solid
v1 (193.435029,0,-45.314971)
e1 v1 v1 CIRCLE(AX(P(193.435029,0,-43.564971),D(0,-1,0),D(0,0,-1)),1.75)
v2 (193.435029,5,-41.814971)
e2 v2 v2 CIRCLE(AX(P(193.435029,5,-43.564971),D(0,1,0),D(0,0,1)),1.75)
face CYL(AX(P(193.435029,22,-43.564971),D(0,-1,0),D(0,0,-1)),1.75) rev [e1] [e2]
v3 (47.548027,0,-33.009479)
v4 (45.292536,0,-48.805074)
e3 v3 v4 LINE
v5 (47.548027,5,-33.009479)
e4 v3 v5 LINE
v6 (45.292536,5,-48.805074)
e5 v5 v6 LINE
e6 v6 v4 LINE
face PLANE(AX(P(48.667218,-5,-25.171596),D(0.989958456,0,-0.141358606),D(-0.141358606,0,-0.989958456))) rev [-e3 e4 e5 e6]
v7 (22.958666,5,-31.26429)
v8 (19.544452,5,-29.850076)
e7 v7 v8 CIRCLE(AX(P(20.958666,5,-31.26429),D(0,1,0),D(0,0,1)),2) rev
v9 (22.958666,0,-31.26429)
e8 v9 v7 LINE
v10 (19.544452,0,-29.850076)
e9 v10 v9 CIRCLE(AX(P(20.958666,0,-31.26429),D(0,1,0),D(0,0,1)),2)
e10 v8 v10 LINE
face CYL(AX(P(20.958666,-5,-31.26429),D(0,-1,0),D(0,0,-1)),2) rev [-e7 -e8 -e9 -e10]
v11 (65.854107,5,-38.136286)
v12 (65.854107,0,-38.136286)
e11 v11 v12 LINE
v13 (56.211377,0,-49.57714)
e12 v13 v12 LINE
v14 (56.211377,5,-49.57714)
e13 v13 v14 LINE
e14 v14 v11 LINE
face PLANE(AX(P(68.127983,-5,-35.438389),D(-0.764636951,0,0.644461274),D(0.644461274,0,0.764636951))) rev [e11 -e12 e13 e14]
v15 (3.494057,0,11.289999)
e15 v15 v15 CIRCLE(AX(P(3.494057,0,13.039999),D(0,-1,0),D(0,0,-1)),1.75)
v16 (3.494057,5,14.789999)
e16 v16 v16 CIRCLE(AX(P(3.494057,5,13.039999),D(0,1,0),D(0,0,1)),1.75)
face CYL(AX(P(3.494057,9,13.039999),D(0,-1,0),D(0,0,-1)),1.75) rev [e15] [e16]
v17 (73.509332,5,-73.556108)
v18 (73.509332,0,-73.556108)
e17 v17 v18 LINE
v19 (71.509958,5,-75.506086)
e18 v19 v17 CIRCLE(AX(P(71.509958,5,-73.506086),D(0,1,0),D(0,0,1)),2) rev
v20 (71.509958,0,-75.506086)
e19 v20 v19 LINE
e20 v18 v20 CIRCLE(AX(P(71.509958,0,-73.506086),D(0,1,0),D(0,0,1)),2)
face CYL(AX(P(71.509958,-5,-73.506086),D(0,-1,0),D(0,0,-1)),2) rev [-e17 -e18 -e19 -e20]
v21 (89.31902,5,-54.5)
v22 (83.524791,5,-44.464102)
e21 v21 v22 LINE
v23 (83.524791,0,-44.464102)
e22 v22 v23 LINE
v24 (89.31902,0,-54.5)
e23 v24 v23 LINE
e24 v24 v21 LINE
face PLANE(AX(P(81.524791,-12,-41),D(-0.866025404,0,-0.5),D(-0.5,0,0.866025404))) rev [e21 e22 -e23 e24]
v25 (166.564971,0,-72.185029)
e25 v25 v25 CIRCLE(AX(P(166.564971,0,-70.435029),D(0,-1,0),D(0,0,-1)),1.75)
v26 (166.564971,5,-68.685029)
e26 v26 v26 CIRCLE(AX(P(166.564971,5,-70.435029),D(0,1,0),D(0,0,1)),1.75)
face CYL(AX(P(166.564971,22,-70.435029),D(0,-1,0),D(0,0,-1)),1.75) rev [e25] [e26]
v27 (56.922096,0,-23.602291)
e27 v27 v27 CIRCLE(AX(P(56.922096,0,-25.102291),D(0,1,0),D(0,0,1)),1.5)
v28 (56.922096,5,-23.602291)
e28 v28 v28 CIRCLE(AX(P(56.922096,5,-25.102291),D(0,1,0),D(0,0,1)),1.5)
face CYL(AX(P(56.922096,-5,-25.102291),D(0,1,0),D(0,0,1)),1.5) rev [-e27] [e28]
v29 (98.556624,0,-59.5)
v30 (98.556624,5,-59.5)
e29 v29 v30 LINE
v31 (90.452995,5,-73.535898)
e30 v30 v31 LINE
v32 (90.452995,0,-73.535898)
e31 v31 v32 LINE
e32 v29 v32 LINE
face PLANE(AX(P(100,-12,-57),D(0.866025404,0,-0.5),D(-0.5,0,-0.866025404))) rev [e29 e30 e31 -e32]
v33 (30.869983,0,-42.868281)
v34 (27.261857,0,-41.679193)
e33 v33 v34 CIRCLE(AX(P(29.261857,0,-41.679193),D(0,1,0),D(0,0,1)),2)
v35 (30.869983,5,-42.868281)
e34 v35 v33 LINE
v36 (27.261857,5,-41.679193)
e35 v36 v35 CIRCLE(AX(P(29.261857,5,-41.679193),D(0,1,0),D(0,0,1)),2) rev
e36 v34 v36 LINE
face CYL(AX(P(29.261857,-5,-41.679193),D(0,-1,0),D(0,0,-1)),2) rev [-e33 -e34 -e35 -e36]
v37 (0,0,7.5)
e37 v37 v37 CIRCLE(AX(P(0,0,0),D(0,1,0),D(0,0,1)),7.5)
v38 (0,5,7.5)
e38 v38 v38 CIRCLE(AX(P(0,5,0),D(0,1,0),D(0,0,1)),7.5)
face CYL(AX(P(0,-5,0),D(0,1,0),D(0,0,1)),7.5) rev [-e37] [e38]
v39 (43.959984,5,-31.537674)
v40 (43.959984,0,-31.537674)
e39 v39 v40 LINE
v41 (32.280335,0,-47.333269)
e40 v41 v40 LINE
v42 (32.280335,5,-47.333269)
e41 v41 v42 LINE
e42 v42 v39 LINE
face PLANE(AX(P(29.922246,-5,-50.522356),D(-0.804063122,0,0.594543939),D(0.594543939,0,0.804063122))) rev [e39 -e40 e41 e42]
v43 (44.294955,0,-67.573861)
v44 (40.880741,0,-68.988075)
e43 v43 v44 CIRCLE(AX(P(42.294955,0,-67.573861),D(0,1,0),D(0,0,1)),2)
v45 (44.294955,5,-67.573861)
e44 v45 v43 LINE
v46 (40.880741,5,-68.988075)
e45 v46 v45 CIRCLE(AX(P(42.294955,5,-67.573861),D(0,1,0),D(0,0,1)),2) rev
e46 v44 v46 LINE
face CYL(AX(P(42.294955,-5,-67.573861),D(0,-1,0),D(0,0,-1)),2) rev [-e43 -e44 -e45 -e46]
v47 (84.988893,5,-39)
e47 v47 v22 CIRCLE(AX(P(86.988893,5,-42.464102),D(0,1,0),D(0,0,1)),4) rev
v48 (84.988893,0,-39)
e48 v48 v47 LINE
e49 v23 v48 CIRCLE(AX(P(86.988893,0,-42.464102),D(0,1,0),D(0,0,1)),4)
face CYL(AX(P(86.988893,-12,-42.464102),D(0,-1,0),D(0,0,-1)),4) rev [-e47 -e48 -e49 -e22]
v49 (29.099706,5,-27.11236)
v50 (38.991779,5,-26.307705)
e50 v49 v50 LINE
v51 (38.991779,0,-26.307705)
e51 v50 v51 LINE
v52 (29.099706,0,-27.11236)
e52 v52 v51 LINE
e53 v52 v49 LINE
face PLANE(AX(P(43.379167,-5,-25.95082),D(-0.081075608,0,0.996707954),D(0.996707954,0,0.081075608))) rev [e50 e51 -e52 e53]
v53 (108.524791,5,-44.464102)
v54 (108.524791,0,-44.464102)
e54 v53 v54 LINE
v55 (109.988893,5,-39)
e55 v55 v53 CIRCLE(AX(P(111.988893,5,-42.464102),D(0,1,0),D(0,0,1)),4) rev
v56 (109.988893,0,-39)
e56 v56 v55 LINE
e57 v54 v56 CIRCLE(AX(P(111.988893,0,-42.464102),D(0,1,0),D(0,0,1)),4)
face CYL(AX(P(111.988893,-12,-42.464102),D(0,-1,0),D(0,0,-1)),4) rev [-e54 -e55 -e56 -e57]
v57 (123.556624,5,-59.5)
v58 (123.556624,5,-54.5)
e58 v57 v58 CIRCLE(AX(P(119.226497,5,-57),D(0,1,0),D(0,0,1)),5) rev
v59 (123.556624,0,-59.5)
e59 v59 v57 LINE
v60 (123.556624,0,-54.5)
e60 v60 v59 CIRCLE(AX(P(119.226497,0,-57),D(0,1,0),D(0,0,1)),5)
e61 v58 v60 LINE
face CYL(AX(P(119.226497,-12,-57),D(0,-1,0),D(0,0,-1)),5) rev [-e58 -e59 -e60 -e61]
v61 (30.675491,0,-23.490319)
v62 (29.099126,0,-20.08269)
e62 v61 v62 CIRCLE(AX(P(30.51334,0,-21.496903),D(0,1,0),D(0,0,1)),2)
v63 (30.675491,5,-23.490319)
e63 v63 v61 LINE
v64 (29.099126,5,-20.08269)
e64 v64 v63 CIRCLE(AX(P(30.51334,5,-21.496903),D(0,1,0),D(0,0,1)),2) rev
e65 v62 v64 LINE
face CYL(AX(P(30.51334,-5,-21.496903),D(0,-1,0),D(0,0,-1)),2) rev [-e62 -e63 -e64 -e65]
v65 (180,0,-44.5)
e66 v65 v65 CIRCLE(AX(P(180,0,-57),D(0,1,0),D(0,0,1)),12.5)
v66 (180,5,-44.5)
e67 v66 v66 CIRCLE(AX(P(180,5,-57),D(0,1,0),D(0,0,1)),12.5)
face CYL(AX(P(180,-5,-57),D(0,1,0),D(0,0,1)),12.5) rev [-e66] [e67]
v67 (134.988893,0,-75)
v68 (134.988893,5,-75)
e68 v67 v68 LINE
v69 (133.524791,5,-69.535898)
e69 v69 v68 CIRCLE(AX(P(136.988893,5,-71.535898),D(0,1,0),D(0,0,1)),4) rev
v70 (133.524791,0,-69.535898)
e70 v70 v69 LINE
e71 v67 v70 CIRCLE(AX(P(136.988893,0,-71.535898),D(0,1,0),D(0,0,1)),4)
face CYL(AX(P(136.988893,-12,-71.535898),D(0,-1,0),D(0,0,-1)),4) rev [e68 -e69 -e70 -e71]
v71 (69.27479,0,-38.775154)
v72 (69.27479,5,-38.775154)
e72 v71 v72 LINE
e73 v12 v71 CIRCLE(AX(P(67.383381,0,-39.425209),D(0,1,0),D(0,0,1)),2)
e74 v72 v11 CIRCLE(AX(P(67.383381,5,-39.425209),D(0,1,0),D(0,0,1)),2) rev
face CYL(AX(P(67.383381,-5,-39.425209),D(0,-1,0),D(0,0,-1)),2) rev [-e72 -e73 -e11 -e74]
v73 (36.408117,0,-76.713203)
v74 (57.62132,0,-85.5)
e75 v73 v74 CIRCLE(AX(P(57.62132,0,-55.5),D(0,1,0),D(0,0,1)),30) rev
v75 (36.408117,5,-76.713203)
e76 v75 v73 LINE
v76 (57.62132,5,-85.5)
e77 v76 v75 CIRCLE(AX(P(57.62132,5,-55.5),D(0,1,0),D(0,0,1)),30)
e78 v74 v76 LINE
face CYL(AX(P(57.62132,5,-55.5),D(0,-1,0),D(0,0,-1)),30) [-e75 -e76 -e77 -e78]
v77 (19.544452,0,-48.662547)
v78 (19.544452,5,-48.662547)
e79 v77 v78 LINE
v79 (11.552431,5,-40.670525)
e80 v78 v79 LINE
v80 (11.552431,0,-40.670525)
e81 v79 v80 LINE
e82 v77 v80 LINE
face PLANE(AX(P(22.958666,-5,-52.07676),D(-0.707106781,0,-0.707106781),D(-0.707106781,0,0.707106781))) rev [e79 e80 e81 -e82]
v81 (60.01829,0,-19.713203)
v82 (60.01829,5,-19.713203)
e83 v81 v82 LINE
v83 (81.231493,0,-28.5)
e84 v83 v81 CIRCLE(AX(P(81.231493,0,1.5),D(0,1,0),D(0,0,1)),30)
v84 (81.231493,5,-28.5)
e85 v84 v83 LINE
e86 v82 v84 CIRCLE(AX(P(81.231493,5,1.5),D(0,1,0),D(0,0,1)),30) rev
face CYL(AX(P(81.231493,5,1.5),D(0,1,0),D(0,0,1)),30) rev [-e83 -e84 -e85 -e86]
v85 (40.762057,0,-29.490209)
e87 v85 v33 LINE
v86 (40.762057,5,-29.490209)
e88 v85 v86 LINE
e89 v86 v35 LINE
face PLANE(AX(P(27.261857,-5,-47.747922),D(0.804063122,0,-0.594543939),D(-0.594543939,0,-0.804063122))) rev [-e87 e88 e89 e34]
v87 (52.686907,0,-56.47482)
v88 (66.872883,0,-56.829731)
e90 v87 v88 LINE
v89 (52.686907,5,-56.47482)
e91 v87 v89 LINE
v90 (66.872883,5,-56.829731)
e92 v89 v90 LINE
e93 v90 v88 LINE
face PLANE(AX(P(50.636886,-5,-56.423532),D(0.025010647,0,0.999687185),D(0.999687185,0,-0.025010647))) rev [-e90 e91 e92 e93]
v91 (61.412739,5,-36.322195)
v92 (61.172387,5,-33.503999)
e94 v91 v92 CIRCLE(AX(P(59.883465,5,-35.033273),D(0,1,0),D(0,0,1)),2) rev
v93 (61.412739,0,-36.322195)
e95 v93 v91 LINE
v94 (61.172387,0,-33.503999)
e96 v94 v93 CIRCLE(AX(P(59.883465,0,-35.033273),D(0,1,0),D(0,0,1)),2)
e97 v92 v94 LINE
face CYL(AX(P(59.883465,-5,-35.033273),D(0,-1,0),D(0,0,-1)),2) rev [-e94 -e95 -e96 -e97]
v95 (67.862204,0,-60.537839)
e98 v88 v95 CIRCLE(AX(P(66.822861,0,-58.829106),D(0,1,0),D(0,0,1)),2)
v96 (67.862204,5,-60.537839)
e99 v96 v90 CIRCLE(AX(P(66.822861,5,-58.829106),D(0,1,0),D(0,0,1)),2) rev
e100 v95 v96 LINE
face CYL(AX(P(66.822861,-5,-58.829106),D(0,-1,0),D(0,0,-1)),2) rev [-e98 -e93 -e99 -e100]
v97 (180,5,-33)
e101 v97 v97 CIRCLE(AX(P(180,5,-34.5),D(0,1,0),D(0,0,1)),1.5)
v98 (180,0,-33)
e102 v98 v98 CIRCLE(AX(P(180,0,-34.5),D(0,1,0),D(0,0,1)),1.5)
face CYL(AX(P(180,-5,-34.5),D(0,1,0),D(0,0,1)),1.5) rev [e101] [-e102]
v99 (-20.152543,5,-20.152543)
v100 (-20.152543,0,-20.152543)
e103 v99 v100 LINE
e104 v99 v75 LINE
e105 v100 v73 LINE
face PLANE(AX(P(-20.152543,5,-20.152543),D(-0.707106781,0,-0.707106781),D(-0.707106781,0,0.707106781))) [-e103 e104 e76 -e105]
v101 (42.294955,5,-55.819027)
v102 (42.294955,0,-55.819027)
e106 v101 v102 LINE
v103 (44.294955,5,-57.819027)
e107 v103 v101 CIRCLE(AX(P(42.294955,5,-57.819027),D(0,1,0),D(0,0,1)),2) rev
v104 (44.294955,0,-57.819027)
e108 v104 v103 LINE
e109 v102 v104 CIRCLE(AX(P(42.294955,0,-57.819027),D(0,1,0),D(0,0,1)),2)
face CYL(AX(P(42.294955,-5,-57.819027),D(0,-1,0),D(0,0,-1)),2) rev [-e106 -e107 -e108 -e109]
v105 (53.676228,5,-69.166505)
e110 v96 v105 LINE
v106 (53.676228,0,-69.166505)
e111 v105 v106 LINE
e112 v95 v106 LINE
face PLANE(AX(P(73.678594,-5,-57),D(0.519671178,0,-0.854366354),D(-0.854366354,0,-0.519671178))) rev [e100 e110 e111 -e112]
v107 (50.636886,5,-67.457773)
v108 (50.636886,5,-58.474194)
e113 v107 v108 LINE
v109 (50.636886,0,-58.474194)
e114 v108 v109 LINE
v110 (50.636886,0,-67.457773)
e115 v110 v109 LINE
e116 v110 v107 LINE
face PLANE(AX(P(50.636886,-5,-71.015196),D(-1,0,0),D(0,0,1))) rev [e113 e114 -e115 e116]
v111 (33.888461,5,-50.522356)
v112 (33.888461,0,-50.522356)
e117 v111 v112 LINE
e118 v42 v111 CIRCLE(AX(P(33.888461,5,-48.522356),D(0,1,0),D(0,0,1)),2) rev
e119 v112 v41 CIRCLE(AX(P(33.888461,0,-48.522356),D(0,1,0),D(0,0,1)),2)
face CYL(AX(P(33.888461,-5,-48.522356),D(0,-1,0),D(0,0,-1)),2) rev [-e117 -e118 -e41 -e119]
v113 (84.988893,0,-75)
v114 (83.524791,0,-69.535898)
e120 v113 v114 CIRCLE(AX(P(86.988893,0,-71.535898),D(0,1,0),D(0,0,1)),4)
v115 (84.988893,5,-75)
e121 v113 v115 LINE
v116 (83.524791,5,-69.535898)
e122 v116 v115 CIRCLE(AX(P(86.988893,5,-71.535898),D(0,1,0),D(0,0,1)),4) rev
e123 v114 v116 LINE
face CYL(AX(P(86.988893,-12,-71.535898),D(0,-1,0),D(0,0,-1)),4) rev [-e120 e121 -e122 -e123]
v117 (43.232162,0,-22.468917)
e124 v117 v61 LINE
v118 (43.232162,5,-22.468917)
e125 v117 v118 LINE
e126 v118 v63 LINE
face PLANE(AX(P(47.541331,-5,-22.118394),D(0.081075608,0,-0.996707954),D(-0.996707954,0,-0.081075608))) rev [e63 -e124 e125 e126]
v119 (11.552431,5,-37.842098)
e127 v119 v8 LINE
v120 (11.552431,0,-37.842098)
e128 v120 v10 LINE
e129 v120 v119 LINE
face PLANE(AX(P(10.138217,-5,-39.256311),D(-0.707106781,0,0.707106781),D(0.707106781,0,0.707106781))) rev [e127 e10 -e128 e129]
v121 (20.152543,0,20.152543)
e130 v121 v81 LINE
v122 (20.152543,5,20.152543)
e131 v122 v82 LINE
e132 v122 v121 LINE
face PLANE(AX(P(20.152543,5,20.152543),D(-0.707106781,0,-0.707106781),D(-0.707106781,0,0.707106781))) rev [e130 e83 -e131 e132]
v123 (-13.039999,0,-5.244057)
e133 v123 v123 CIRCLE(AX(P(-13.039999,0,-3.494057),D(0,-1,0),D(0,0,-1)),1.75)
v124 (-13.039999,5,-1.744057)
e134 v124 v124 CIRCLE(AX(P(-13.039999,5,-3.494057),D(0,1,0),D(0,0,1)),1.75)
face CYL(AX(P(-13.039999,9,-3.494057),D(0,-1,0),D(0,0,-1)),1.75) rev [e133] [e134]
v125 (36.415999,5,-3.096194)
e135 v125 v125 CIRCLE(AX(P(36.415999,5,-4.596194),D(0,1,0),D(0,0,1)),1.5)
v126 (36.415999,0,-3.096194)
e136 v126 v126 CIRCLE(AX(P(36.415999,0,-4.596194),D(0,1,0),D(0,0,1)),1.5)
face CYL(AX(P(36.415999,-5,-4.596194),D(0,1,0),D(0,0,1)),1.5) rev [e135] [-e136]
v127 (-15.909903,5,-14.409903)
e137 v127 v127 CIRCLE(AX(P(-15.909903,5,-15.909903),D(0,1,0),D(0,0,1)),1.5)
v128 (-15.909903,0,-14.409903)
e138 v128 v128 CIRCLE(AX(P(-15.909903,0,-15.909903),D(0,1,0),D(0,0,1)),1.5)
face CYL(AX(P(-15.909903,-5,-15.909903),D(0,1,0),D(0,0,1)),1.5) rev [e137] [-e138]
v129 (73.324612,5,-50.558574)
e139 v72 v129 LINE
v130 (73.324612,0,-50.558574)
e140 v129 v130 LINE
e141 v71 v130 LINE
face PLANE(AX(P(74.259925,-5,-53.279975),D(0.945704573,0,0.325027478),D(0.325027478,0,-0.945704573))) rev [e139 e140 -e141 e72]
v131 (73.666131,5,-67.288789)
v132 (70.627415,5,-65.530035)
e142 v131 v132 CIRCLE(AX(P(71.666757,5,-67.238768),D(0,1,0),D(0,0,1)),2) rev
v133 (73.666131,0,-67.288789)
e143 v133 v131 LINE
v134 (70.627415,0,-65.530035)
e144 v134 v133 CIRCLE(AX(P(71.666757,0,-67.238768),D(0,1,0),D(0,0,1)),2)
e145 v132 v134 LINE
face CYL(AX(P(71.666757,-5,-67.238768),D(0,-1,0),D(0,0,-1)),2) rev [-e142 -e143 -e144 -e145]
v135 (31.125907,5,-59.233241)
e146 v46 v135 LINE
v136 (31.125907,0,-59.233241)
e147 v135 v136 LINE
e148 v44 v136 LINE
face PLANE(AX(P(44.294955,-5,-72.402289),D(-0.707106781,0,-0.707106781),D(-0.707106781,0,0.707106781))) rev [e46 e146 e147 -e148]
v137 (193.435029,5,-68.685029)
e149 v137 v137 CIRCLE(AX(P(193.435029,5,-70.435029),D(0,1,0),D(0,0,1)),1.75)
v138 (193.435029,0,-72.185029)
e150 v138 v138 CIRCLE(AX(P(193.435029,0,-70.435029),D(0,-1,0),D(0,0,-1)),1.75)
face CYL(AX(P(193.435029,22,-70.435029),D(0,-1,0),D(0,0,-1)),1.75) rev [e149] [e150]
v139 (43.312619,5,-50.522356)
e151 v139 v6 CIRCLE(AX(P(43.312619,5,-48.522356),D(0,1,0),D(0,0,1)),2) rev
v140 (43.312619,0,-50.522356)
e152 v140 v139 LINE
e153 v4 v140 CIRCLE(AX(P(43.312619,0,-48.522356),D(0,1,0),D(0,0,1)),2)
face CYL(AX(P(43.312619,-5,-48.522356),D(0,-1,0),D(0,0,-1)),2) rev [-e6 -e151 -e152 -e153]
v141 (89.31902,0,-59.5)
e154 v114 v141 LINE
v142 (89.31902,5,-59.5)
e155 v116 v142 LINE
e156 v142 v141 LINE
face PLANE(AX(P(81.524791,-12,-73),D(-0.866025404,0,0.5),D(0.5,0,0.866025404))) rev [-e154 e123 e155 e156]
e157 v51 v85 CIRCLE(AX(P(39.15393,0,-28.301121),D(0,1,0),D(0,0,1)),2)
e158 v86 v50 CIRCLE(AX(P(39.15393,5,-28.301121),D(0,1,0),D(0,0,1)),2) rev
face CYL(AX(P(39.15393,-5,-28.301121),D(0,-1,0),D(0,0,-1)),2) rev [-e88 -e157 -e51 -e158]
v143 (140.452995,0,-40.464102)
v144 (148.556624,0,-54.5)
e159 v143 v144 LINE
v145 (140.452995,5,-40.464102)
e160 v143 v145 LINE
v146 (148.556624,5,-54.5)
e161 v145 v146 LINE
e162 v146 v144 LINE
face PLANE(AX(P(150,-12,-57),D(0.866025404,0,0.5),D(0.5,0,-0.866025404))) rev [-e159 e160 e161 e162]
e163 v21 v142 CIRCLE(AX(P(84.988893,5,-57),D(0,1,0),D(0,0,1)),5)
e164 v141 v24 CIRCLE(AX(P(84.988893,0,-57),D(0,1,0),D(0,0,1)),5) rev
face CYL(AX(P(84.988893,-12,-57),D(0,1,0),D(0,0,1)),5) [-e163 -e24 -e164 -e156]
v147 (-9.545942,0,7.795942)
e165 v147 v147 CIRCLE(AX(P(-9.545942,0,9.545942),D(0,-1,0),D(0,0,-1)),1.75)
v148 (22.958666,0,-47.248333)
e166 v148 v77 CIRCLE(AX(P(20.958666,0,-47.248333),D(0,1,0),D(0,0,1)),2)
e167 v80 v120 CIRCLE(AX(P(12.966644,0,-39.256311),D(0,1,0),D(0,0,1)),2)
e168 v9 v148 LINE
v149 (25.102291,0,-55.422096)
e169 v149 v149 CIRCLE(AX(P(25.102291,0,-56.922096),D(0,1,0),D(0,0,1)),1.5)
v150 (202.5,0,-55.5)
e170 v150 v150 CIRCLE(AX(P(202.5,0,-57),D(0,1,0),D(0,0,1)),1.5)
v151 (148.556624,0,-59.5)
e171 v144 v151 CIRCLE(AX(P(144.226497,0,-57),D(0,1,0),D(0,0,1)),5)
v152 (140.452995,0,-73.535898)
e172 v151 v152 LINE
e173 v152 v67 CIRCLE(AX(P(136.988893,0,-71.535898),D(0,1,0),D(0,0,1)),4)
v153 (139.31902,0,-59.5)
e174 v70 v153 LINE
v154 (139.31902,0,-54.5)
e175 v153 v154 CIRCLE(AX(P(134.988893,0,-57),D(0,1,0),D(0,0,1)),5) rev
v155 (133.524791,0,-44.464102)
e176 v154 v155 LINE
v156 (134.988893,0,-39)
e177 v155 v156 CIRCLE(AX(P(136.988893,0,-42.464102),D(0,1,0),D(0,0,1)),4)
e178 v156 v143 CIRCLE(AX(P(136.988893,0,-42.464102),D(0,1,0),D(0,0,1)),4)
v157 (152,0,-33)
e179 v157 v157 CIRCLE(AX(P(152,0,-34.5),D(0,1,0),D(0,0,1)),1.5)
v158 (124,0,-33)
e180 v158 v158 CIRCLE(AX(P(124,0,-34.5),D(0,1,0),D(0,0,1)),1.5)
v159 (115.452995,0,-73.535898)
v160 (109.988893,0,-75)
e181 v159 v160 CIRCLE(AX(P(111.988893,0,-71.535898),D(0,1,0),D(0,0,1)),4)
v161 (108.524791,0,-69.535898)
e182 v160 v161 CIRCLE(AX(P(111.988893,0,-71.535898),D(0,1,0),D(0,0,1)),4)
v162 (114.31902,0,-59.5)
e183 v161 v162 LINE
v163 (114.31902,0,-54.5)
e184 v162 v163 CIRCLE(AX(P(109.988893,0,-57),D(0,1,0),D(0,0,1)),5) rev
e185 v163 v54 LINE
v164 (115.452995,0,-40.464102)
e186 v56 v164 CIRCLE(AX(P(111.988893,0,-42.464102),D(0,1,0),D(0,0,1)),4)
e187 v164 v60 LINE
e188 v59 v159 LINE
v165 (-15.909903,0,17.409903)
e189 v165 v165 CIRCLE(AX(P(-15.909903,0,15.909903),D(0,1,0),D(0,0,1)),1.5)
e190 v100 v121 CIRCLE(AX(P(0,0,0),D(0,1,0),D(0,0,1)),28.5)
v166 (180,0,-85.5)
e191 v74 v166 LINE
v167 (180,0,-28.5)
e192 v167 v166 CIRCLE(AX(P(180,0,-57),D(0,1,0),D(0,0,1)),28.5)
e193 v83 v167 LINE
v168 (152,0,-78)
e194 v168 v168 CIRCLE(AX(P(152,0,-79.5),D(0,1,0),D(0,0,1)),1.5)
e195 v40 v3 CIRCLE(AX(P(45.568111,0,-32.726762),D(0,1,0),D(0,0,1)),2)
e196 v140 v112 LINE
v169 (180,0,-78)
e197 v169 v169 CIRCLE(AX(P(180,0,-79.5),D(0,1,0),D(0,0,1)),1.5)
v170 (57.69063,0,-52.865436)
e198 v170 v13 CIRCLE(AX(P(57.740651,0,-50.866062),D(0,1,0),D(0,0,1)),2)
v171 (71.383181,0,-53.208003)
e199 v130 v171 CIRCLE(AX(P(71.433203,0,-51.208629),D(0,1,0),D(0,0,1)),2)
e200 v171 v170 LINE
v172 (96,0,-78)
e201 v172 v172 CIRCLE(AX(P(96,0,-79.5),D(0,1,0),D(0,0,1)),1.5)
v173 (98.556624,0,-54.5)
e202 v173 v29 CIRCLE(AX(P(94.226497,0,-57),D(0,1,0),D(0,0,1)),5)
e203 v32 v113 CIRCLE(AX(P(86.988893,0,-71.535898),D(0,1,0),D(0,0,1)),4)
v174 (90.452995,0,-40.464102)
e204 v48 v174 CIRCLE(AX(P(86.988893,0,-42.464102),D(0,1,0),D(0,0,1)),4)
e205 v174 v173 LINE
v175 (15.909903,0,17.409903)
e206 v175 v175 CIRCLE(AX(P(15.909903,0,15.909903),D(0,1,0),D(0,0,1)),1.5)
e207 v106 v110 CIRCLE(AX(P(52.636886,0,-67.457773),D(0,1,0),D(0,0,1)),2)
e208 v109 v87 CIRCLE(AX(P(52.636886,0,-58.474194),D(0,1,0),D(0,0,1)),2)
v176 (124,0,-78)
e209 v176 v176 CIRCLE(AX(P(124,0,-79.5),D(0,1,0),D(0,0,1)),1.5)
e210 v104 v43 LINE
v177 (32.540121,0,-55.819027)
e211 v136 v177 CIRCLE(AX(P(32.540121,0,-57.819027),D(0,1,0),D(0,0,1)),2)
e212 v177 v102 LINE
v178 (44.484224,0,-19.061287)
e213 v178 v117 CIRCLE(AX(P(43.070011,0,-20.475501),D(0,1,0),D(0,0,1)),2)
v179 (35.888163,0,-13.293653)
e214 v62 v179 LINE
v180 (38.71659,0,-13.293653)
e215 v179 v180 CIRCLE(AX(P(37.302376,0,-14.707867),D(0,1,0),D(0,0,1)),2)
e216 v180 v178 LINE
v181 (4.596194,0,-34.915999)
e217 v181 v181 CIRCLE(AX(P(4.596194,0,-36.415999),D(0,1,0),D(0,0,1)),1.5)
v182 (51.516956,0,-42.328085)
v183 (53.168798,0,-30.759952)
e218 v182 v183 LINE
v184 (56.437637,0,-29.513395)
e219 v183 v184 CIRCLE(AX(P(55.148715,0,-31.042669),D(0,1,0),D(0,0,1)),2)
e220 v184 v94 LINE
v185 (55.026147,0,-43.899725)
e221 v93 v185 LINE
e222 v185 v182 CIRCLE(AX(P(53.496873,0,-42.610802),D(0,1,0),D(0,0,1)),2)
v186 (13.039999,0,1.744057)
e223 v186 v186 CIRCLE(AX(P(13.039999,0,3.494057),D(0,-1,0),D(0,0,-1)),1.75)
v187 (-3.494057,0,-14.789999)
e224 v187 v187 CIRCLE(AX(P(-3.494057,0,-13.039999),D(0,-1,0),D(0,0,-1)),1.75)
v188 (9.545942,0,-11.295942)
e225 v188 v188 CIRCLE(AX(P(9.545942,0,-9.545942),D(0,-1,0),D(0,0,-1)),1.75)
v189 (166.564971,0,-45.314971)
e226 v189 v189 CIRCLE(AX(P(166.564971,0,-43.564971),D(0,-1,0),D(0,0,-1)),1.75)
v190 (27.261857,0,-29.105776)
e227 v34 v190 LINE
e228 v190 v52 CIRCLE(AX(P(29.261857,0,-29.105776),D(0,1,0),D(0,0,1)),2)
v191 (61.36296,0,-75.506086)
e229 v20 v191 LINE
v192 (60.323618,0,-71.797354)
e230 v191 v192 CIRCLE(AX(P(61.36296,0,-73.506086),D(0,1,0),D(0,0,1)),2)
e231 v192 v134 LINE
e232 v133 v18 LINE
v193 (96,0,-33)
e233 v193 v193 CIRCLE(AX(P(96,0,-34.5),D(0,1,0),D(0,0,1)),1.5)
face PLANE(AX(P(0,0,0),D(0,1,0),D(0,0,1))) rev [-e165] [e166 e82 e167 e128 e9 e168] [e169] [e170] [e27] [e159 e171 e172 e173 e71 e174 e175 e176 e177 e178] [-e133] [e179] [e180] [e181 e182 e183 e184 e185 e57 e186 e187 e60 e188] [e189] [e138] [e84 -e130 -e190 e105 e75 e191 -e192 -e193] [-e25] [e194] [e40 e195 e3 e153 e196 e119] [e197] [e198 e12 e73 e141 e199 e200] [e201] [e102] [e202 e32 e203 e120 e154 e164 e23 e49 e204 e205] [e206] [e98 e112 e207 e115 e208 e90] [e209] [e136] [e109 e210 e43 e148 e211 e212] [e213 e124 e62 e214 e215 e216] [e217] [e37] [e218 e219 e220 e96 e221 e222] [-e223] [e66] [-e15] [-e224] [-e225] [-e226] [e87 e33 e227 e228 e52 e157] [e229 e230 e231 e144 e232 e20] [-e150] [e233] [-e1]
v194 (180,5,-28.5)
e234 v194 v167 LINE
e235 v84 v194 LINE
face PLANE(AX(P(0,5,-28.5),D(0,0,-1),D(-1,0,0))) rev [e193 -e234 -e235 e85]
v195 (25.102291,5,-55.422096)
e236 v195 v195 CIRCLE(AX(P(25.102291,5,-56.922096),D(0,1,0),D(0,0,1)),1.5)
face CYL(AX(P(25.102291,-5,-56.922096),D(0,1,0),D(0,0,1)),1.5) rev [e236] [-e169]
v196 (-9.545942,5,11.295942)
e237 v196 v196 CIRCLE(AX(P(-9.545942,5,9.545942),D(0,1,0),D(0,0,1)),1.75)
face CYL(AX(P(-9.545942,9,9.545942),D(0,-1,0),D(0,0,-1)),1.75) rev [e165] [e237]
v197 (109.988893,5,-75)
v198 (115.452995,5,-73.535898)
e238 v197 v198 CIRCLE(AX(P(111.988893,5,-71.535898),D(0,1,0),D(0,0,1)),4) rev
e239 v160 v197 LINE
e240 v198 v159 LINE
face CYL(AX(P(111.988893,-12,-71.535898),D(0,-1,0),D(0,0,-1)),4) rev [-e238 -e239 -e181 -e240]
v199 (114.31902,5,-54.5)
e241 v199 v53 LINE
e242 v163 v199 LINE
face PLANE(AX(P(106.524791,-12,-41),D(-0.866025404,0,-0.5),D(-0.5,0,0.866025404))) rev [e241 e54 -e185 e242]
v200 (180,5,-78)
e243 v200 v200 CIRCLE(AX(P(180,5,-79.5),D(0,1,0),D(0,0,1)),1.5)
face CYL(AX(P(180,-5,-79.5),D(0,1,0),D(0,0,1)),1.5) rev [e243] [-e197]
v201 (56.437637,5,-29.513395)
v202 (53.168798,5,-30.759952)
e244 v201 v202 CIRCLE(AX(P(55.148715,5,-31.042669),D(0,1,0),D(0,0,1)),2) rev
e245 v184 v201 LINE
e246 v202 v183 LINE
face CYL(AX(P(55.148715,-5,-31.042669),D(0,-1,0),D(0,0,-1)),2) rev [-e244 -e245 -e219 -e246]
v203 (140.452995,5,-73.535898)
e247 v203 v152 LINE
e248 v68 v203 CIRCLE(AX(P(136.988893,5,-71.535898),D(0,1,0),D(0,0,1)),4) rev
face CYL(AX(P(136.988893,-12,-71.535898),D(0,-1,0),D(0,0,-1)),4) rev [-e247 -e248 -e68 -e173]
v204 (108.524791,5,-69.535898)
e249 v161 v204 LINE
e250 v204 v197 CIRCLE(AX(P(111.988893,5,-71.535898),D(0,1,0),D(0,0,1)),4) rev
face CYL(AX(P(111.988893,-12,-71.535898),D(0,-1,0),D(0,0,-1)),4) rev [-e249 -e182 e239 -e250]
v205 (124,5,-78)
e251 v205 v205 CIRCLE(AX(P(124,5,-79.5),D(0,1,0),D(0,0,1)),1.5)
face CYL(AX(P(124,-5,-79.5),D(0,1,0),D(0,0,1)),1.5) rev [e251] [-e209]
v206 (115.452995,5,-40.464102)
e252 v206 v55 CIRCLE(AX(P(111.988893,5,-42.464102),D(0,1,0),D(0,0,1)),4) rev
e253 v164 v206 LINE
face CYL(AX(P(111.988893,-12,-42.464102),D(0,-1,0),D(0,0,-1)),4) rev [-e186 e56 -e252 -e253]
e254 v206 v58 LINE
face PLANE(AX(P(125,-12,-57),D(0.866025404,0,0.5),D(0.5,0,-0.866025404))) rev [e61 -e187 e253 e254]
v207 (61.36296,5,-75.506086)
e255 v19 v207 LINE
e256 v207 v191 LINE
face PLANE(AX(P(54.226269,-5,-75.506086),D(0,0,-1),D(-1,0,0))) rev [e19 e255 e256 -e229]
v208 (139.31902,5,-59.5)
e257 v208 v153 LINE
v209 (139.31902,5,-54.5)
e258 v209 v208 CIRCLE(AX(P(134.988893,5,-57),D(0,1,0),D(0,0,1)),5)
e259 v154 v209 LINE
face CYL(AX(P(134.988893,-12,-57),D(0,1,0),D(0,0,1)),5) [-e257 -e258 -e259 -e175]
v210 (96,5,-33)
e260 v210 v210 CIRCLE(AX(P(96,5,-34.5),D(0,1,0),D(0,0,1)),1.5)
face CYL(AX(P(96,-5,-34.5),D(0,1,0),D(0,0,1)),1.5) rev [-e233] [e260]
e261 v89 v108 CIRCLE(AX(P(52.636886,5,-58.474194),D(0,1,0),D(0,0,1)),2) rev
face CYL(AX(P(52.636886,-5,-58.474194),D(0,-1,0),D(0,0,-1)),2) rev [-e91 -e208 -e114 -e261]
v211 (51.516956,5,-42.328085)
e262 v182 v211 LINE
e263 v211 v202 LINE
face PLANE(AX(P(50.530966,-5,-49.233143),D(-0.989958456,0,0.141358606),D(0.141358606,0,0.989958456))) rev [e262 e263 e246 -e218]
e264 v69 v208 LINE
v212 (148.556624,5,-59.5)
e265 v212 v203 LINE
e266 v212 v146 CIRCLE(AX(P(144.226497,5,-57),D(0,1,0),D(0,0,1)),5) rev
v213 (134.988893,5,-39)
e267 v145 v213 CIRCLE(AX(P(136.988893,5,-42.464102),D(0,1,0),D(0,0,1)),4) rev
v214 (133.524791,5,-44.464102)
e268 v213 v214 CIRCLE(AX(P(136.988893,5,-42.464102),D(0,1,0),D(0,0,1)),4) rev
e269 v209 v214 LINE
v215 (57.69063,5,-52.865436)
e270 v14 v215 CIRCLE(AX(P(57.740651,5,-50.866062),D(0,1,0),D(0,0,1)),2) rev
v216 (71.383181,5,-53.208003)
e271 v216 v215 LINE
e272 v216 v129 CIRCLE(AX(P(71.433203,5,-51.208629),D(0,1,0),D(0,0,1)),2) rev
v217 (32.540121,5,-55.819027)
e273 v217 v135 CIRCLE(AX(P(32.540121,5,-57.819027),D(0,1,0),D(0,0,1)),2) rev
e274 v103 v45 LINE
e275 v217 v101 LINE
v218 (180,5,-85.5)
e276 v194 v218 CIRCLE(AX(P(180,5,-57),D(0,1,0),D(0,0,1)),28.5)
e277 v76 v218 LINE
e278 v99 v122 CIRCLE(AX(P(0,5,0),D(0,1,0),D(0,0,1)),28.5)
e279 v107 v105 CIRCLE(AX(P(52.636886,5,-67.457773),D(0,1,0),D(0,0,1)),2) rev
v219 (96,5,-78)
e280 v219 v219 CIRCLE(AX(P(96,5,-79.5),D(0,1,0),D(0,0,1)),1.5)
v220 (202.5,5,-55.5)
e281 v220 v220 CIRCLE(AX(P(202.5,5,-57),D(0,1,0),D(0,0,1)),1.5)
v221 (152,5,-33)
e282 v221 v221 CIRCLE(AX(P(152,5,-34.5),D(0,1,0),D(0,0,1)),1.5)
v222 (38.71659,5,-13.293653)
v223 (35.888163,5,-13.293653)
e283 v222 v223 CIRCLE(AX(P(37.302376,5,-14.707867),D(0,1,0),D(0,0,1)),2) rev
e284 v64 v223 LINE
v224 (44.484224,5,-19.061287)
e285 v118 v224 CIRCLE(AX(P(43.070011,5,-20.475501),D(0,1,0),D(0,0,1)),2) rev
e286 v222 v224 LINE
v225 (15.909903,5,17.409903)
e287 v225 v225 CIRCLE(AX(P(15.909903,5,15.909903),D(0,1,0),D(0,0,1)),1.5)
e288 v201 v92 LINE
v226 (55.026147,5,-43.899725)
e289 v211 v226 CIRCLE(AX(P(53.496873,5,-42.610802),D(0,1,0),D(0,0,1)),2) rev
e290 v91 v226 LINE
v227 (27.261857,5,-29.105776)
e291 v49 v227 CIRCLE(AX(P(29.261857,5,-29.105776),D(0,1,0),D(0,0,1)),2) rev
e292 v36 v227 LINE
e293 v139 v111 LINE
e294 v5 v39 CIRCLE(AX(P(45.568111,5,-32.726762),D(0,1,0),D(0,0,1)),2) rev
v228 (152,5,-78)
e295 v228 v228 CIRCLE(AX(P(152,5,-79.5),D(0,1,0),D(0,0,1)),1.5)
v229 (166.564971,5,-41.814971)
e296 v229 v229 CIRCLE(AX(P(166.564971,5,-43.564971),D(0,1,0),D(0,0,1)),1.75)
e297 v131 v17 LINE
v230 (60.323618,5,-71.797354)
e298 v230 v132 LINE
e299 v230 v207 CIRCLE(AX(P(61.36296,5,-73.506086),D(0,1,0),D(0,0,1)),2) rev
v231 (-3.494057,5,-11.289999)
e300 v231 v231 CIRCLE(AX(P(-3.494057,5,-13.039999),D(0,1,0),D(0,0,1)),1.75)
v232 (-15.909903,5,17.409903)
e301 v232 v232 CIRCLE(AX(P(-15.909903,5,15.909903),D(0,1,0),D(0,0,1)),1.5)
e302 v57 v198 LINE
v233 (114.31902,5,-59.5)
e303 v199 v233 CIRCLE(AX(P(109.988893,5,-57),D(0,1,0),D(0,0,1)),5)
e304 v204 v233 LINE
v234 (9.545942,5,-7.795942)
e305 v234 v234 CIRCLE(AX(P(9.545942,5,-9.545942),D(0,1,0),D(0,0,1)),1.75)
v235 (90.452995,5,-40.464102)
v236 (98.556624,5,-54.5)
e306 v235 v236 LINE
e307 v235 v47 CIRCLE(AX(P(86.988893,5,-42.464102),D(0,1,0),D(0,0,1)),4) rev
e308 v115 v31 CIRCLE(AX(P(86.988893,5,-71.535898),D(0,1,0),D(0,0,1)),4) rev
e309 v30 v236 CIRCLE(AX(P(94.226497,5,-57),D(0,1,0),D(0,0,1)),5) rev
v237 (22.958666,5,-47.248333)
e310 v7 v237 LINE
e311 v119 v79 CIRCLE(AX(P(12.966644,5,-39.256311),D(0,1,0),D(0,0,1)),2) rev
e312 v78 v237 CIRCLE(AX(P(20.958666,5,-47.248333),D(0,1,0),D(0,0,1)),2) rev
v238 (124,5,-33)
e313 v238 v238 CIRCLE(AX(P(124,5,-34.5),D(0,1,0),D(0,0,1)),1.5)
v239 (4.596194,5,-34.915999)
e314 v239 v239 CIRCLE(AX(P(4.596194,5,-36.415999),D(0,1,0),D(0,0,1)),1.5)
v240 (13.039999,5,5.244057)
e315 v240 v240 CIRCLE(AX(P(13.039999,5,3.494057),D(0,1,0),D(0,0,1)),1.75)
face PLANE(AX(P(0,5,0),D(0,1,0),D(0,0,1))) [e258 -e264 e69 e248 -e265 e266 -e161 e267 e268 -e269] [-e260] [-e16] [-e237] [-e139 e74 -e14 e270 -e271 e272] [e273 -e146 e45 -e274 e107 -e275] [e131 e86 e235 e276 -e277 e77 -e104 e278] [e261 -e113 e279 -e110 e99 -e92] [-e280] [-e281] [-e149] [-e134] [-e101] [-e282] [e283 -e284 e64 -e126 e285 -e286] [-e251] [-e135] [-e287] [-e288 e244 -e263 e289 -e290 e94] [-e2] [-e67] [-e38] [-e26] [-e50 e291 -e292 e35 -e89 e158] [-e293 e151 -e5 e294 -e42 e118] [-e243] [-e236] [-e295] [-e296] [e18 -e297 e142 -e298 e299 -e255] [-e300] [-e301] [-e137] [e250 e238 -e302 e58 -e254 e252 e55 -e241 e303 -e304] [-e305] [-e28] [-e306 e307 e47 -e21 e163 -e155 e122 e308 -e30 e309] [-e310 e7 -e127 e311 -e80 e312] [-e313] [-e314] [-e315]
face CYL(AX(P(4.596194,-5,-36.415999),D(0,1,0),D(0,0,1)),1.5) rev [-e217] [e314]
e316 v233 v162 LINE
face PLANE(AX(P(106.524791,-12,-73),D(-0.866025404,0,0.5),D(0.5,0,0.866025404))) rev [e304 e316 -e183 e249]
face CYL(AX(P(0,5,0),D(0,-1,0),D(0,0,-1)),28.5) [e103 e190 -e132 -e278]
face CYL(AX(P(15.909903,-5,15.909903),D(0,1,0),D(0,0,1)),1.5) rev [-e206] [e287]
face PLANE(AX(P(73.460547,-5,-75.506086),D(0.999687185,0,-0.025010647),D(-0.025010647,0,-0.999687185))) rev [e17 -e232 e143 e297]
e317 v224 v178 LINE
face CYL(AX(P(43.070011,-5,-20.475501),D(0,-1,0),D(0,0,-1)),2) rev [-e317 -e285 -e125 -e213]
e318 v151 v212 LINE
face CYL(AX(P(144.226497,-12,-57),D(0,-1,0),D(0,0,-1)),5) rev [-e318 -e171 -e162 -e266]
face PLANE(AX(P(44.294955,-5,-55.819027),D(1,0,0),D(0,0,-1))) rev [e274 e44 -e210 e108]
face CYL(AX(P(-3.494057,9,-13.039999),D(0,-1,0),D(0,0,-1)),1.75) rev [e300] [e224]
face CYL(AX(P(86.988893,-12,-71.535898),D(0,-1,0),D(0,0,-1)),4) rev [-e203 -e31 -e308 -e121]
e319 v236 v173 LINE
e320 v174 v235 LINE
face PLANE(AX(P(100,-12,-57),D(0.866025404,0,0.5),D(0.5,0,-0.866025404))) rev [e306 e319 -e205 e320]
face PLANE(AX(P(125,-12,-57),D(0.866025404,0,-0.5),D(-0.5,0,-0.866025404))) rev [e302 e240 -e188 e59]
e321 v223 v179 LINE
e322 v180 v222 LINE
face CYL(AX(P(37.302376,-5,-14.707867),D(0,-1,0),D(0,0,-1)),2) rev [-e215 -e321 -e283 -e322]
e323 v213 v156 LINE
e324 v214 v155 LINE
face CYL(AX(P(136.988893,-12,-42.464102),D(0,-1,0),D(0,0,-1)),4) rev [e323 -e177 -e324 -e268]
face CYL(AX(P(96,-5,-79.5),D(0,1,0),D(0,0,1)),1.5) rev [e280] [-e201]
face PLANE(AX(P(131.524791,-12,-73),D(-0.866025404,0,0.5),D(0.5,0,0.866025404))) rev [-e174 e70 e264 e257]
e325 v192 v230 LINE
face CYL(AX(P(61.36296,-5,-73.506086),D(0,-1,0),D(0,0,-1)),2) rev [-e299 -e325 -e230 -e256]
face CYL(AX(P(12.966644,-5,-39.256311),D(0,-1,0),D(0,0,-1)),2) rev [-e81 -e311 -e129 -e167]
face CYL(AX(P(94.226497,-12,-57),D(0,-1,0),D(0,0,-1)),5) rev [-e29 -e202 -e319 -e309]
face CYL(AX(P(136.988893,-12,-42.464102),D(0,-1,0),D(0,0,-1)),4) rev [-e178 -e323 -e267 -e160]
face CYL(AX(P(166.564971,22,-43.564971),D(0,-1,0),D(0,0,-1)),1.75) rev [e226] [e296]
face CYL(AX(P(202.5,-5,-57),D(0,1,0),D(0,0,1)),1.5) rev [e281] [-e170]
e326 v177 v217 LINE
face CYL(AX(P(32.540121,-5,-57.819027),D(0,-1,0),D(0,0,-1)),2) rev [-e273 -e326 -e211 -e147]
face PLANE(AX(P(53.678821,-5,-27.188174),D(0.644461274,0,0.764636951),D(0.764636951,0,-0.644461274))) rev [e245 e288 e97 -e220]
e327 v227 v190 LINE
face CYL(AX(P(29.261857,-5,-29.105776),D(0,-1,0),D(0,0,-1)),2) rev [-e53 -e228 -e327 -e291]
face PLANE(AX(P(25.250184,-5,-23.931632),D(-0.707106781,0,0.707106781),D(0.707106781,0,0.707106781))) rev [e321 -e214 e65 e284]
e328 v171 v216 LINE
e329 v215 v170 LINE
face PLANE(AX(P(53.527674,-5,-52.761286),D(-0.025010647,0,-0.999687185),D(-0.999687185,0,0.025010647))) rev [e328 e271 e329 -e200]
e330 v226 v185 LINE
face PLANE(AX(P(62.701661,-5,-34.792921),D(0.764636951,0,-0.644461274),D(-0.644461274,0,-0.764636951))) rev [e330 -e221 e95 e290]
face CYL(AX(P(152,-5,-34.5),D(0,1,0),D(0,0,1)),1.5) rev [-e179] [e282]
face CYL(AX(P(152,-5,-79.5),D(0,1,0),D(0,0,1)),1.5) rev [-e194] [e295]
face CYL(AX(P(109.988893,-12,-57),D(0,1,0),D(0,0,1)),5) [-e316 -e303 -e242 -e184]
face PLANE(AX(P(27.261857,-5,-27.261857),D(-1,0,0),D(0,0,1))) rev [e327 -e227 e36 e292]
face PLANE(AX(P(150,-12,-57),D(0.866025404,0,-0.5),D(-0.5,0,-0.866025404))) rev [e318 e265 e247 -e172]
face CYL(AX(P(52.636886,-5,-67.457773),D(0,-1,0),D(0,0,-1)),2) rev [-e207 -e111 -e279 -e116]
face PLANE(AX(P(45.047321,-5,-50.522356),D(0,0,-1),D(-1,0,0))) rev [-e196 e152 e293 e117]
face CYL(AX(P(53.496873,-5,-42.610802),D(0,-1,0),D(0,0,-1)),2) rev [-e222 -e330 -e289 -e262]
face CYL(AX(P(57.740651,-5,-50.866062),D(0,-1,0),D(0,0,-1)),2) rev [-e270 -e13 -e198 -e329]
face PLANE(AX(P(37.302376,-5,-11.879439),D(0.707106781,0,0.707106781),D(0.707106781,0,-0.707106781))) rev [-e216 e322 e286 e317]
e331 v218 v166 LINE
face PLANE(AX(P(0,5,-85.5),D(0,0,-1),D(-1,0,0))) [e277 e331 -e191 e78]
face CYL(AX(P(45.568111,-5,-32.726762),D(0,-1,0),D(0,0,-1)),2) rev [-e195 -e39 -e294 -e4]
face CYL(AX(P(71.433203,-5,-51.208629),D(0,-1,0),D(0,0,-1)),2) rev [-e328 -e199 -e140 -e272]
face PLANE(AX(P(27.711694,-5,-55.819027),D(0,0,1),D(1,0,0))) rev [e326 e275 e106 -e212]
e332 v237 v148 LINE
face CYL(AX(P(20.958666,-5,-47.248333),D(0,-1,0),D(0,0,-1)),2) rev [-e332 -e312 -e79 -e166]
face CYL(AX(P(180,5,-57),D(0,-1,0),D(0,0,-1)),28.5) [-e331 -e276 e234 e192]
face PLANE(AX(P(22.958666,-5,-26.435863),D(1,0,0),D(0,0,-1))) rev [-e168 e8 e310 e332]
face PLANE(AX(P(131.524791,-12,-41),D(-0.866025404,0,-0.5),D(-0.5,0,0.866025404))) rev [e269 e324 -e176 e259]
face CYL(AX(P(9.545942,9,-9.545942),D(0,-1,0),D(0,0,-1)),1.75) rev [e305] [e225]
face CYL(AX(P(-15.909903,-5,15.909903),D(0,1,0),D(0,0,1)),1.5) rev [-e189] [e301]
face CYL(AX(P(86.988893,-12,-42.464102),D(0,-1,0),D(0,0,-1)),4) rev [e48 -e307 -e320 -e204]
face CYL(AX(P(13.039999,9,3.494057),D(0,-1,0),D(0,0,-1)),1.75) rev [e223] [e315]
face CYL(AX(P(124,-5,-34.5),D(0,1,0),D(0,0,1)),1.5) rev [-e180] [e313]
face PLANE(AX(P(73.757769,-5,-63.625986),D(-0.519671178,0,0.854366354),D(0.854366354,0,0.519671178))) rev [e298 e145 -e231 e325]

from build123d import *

# Parameters (mm, degrees)
SKETCH_1_R          = 28.5
EXTRUDE_1_DEPTH     = 5
FILLET_1_R          = 30
FILLET_2_R          = 30
CUT_EXTRUDE_1_DEPTH = 17
FILLET_3_R          = 5
FILLET_4_R          = 4
SKETCH_3_R          = 1.75
CUT_EXTRUDE_2_DEPTH = 22
SKETCH_4_R          = 1.75
CUT_EXTRUDE_3_DEPTH = 9
CUT_EXTRUDE_6_DEPTH = 10
FILLET_7_R          = 2
FILLET_8_R          = 2
SKETCH_8_R          = 1.5
CUT_EXTRUDE_7_DEPTH = 10
SKETCH_10_R         = 7.5
SKETCH_10_R_2       = 12.5
CUT_EXTRUDE_8_DEPTH = 10


with BuildPart() as part:
    # 草图1 → 凸台-拉伸1 (new body)
    with BuildSketch(Plane(origin=(0, 0, 0), x_dir=(1, 0, 0), z_dir=(0, 1, 0))):
        with BuildLine():
            Line((45.194913472, 85.5), (-20.152543264, 20.152543264))
            ThreePointArc((-20.152543264, 20.152543264), (10.906477822, 26.330566677), (28.5, 0))
            ThreePointArc((28.5, 0), (26.330566677, -10.906477822), (20.152543264, -20.152543264))
            Line((20.152543264, -20.152543264), (68.805086528, 28.5))
            Line((68.805086528, 28.5), (180, 28.5))
            ThreePointArc((180, 28.5), (151.5, 57), (180, 85.5))
            Line((180, 85.5), (45.194913472, 85.5))
        make_face()
        Circle(SKETCH_1_R)
        with Locations((180, 57)):
            Circle(SKETCH_1_R)
    extrude(amount=EXTRUDE_1_DEPTH)

    # 圆角1
    fillet_1_edges = [part.edges().sort_by_distance(p)[0] for p in [
        (68.805086528, 2.5, -28.5),
    ]]
    fillet(fillet_1_edges, radius=FILLET_1_R)

    # 圆角2
    fillet_2_edges = [part.edges().sort_by_distance(p)[0] for p in [
        (45.194913472, 2.5, -85.5),
    ]]
    fillet(fillet_2_edges, radius=FILLET_2_R)

    # 草图2 → 切除-拉伸1 (cut)
    with BuildSketch(Plane(origin=(0, 5, 0), x_dir=(1, 0, 0), z_dir=(0, 1, 0))):
        Polygon((150, 57), (138.452994616, 77), (131.524791386, 73), (140.762395693, 57), (131.524791386, 41), (138.452994616, 37), align=None)
        Polygon((106.524791386, 41), (115.762395693, 57), (106.524791386, 73), (113.452994616, 77), (125, 57), (113.452994616, 37), align=None)
        Polygon((81.524791386, 41), (90.762395693, 57), (81.524791386, 73), (88.452994616, 77), (100, 57), (88.452994616, 37), align=None)
    extrude(amount=-CUT_EXTRUDE_1_DEPTH, mode=Mode.SUBTRACT)

    # 圆角3
    fillet_3_edges = [part.edges().sort_by_distance(p)[0] for p in [
        (150, 2.5, -57),
        (140.762395693, 2.5, -57),
        (125, 2.5, -57),
        (115.762395693, 2.5, -57),
        (100, 2.5, -57),
        (90.762395693, 2.5, -57),
    ]]
    fillet(fillet_3_edges, radius=FILLET_3_R)

    # 圆角4
    fillet_4_edges = [part.edges().sort_by_distance(p)[0] for p in [
        (88.452994616, 2.5, -37),
        (81.524791386, 2.5, -41),
        (81.524791386, 2.5, -73),
        (106.524791386, 2.5, -73),
        (88.452994616, 2.5, -77),
        (113.452994616, 2.5, -77),
        (113.452994616, 2.5, -37),
        (106.524791386, 2.5, -41),
        (131.524791386, 2.5, -41),
        (138.452994616, 2.5, -37),
        (131.524791386, 2.5, -73),
        (138.452994616, 2.5, -77),
    ]]
    fillet(fillet_4_edges, radius=FILLET_4_R - 0.0001)  # a hair under: the kernel refuses the full size

    # 草图3 → 切除-拉伸2 (cut)
    with BuildSketch(Plane.XZ):
        with Locations(Location((193.435028843, -43.564971157, 0), (0, 0, 270))):
            Circle(SKETCH_3_R)
        with Locations(Location((193.435028843, -70.435028843, 0), (0, 0, 270))):
            Circle(SKETCH_3_R)
        with Locations(Location((166.564971157, -70.435028843, 0), (0, 0, 270))):
            Circle(SKETCH_3_R)
        with Locations(Location((166.564971157, -43.564971157, 0), (0, 0, 270))):
            Circle(SKETCH_3_R)
    extrude(amount=-CUT_EXTRUDE_2_DEPTH, mode=Mode.SUBTRACT)

    # 草图4 → 切除-拉伸3 (cut)
    with BuildSketch(Plane.XZ):
        with Locations(Location((3.494057109, 13.039998655, 0), (0, 0, 270))):
            Circle(SKETCH_4_R)
        with Locations(Location((-9.545941546, 9.545941546, 0), (0, 0, 270))):
            Circle(SKETCH_4_R)
        with Locations(Location((13.039998655, 3.494057109, 0), (0, 0, 270))):
            Circle(SKETCH_4_R)
        with Locations(Location((9.545941546, -9.545941546, 0), (0, 0, 270))):
            Circle(SKETCH_4_R)
        with Locations(Location((-3.494057109, -13.039998655, 0), (0, 0, 270))):
            Circle(SKETCH_4_R)
        with Locations(Location((-13.039998655, -3.494057109, 0), (0, 0, 270))):
            Circle(SKETCH_4_R)
    extrude(amount=-CUT_EXTRUDE_3_DEPTH, mode=Mode.SUBTRACT)

    # 草图7 → 切除-拉伸6 (cut)
    with BuildSketch(Plane(origin=(0, 5, 0), x_dir=(1, 0, 0), z_dir=(0, 1, 0))):
        Polygon((37.302376212, 11.879439437), (47.541331092, 22.118394317), (25.250183738, 23.931631911), align=None)
        Polygon((73.460547005, 75.506086264), (73.757768972, 63.62598632), (54.226268855, 75.506086264), align=None)
        Polygon((44.294954722, 72.402288525), (27.711693587, 55.81902739), (44.294954722, 55.81902739), align=None)
        Polygon((50.636885885, 71.015195544), (50.636885885, 56.423531637), (73.678593841, 57), align=None)
        Polygon((53.527673936, 52.761285689), (74.259925291, 53.279974973), (68.127983229, 35.438389149), align=None)
        Polygon((53.678821017, 27.188173586), (62.701661284, 34.792921342), (50.530965527, 49.233143064), align=None)
        Polygon((45.047320543, 50.522356459), (29.922245502, 50.522356459), (48.667218123, 25.171595633), align=None)
        Polygon((22.958665814, 52.076760267), (10.138217033, 39.256311486), (22.958665814, 26.435862705), align=None)
        Polygon((27.261857105, 47.74792215), (43.379167297, 25.950820384), (27.261857105, 27.261857105), align=None)
    extrude(amount=-CUT_EXTRUDE_6_DEPTH, mode=Mode.SUBTRACT)

    # 圆角7
    fillet_7_edges = [part.edges().sort_by_distance(p)[0] for p in [
        (44.294954722, 2.5, -72.402288525),
        (44.294954722, 2.5, -55.81902739),
        (27.711693587, 2.5, -55.81902739),
        (50.636885885, 2.5, -71.015195544),
        (73.678593841, 2.5, -57),
        (50.636885885, 2.5, -56.423531637),
        (68.127983229, 2.5, -35.438389149),
        (53.527673936, 2.5, -52.761285689),
        (74.259925291, 2.5, -53.279974973),
        (53.678821017, 2.5, -27.188173586),
        (50.530965527, 2.5, -49.233143064),
        (62.701661284, 2.5, -34.792921342),
        (45.047320543, 2.5, -50.522356459),
        (48.667218123, 2.5, -25.171595633),
        (29.922245502, 2.5, -50.522356459),
        (54.226268855, 2.5, -75.506086264),
        (73.460547005, 2.5, -75.506086264),
        (73.757768972, 2.5, -63.62598632),
    ]]
    fillet(fillet_7_edges, radius=FILLET_7_R)

    # 圆角8
    fillet_8_edges = [part.edges().sort_by_distance(p)[0] for p in [
        (37.302376212, 2.5, -11.879439437),
        (25.250183738, 2.5, -23.931631911),
        (47.541331092, 2.5, -22.118394317),
        (22.958665814, 2.5, -52.076760267),
        (22.958665814, 2.5, -26.435862705),
        (10.138217033, 2.5, -39.256311486),
        (27.261857105, 2.5, -27.261857105),
        (27.261857105, 2.5, -47.74792215),
        (43.379167297, 2.5, -25.950820384),
    ]]
    fillet(fillet_8_edges, radius=FILLET_8_R)

    # 草图8 → 切除-拉伸7 (cut)
    with BuildSketch(Plane(origin=(0, 5, 0), x_dir=(1, 0, 0), z_dir=(0, 1, 0))):
        with Locations(Location((-15.909902577, -15.909902577, 0), (0, 0, 270))):
            Circle(SKETCH_8_R)
        with Locations(Location((-15.909902577, 15.909902577, 0), (0, 0, 270))):
            Circle(SKETCH_8_R)
        with Locations(Location((15.909902577, -15.909902577, 0), (0, 0, 270))):
            Circle(SKETCH_8_R)
        with Locations(Location((4.596194078, 36.415999231, 0), (0, 0, 270))):
            Circle(SKETCH_8_R)
        with Locations(Location((25.102290732, 56.922095886, 0), (0, 0, 270))):
            Circle(SKETCH_8_R)
        with Locations(Location((36.415999231, 4.596194078, 0), (0, 0, 270))):
            Circle(SKETCH_8_R)
        with Locations(Location((56.922095886, 25.102290732, 0), (0, 0, 270))):
            Circle(SKETCH_8_R)
        with Locations(Location((180, 79.5, 0), (0, 0, 270))):
            Circle(SKETCH_8_R)
        with Locations(Location((180, 34.5, 0), (0, 0, 270))):
            Circle(SKETCH_8_R)
        with Locations(Location((152, 79.5, 0), (0, 0, 270))):
            Circle(SKETCH_8_R)
        with Locations(Location((124, 79.5, 0), (0, 0, 270))):
            Circle(SKETCH_8_R)
        with Locations(Location((96, 79.5, 0), (0, 0, 270))):
            Circle(SKETCH_8_R)
        with Locations(Location((152, 34.5, 0), (0, 0, 270))):
            Circle(SKETCH_8_R)
        with Locations(Location((124, 34.5, 0), (0, 0, 270))):
            Circle(SKETCH_8_R)
        with Locations(Location((96, 34.5, 0), (0, 0, 270))):
            Circle(SKETCH_8_R)
        with Locations(Location((202.5, 57, 0), (0, 0, 270))):
            Circle(SKETCH_8_R)
    extrude(amount=-CUT_EXTRUDE_7_DEPTH, mode=Mode.SUBTRACT)

    # 草图10 → 切除-拉伸8 (cut)
    with BuildSketch(Plane(origin=(0, 5, 0), x_dir=(1, 0, 0), z_dir=(0, 1, 0))):
        with Locations(Location((0, 0, 0), (0, 0, 270))):
            Circle(SKETCH_10_R)
        with Locations(Location((180, 57, 0), (0, 0, 270))):
            Circle(SKETCH_10_R_2)
    extrude(amount=-CUT_EXTRUDE_8_DEPTH, mode=Mode.SUBTRACT)


solid = part.part
